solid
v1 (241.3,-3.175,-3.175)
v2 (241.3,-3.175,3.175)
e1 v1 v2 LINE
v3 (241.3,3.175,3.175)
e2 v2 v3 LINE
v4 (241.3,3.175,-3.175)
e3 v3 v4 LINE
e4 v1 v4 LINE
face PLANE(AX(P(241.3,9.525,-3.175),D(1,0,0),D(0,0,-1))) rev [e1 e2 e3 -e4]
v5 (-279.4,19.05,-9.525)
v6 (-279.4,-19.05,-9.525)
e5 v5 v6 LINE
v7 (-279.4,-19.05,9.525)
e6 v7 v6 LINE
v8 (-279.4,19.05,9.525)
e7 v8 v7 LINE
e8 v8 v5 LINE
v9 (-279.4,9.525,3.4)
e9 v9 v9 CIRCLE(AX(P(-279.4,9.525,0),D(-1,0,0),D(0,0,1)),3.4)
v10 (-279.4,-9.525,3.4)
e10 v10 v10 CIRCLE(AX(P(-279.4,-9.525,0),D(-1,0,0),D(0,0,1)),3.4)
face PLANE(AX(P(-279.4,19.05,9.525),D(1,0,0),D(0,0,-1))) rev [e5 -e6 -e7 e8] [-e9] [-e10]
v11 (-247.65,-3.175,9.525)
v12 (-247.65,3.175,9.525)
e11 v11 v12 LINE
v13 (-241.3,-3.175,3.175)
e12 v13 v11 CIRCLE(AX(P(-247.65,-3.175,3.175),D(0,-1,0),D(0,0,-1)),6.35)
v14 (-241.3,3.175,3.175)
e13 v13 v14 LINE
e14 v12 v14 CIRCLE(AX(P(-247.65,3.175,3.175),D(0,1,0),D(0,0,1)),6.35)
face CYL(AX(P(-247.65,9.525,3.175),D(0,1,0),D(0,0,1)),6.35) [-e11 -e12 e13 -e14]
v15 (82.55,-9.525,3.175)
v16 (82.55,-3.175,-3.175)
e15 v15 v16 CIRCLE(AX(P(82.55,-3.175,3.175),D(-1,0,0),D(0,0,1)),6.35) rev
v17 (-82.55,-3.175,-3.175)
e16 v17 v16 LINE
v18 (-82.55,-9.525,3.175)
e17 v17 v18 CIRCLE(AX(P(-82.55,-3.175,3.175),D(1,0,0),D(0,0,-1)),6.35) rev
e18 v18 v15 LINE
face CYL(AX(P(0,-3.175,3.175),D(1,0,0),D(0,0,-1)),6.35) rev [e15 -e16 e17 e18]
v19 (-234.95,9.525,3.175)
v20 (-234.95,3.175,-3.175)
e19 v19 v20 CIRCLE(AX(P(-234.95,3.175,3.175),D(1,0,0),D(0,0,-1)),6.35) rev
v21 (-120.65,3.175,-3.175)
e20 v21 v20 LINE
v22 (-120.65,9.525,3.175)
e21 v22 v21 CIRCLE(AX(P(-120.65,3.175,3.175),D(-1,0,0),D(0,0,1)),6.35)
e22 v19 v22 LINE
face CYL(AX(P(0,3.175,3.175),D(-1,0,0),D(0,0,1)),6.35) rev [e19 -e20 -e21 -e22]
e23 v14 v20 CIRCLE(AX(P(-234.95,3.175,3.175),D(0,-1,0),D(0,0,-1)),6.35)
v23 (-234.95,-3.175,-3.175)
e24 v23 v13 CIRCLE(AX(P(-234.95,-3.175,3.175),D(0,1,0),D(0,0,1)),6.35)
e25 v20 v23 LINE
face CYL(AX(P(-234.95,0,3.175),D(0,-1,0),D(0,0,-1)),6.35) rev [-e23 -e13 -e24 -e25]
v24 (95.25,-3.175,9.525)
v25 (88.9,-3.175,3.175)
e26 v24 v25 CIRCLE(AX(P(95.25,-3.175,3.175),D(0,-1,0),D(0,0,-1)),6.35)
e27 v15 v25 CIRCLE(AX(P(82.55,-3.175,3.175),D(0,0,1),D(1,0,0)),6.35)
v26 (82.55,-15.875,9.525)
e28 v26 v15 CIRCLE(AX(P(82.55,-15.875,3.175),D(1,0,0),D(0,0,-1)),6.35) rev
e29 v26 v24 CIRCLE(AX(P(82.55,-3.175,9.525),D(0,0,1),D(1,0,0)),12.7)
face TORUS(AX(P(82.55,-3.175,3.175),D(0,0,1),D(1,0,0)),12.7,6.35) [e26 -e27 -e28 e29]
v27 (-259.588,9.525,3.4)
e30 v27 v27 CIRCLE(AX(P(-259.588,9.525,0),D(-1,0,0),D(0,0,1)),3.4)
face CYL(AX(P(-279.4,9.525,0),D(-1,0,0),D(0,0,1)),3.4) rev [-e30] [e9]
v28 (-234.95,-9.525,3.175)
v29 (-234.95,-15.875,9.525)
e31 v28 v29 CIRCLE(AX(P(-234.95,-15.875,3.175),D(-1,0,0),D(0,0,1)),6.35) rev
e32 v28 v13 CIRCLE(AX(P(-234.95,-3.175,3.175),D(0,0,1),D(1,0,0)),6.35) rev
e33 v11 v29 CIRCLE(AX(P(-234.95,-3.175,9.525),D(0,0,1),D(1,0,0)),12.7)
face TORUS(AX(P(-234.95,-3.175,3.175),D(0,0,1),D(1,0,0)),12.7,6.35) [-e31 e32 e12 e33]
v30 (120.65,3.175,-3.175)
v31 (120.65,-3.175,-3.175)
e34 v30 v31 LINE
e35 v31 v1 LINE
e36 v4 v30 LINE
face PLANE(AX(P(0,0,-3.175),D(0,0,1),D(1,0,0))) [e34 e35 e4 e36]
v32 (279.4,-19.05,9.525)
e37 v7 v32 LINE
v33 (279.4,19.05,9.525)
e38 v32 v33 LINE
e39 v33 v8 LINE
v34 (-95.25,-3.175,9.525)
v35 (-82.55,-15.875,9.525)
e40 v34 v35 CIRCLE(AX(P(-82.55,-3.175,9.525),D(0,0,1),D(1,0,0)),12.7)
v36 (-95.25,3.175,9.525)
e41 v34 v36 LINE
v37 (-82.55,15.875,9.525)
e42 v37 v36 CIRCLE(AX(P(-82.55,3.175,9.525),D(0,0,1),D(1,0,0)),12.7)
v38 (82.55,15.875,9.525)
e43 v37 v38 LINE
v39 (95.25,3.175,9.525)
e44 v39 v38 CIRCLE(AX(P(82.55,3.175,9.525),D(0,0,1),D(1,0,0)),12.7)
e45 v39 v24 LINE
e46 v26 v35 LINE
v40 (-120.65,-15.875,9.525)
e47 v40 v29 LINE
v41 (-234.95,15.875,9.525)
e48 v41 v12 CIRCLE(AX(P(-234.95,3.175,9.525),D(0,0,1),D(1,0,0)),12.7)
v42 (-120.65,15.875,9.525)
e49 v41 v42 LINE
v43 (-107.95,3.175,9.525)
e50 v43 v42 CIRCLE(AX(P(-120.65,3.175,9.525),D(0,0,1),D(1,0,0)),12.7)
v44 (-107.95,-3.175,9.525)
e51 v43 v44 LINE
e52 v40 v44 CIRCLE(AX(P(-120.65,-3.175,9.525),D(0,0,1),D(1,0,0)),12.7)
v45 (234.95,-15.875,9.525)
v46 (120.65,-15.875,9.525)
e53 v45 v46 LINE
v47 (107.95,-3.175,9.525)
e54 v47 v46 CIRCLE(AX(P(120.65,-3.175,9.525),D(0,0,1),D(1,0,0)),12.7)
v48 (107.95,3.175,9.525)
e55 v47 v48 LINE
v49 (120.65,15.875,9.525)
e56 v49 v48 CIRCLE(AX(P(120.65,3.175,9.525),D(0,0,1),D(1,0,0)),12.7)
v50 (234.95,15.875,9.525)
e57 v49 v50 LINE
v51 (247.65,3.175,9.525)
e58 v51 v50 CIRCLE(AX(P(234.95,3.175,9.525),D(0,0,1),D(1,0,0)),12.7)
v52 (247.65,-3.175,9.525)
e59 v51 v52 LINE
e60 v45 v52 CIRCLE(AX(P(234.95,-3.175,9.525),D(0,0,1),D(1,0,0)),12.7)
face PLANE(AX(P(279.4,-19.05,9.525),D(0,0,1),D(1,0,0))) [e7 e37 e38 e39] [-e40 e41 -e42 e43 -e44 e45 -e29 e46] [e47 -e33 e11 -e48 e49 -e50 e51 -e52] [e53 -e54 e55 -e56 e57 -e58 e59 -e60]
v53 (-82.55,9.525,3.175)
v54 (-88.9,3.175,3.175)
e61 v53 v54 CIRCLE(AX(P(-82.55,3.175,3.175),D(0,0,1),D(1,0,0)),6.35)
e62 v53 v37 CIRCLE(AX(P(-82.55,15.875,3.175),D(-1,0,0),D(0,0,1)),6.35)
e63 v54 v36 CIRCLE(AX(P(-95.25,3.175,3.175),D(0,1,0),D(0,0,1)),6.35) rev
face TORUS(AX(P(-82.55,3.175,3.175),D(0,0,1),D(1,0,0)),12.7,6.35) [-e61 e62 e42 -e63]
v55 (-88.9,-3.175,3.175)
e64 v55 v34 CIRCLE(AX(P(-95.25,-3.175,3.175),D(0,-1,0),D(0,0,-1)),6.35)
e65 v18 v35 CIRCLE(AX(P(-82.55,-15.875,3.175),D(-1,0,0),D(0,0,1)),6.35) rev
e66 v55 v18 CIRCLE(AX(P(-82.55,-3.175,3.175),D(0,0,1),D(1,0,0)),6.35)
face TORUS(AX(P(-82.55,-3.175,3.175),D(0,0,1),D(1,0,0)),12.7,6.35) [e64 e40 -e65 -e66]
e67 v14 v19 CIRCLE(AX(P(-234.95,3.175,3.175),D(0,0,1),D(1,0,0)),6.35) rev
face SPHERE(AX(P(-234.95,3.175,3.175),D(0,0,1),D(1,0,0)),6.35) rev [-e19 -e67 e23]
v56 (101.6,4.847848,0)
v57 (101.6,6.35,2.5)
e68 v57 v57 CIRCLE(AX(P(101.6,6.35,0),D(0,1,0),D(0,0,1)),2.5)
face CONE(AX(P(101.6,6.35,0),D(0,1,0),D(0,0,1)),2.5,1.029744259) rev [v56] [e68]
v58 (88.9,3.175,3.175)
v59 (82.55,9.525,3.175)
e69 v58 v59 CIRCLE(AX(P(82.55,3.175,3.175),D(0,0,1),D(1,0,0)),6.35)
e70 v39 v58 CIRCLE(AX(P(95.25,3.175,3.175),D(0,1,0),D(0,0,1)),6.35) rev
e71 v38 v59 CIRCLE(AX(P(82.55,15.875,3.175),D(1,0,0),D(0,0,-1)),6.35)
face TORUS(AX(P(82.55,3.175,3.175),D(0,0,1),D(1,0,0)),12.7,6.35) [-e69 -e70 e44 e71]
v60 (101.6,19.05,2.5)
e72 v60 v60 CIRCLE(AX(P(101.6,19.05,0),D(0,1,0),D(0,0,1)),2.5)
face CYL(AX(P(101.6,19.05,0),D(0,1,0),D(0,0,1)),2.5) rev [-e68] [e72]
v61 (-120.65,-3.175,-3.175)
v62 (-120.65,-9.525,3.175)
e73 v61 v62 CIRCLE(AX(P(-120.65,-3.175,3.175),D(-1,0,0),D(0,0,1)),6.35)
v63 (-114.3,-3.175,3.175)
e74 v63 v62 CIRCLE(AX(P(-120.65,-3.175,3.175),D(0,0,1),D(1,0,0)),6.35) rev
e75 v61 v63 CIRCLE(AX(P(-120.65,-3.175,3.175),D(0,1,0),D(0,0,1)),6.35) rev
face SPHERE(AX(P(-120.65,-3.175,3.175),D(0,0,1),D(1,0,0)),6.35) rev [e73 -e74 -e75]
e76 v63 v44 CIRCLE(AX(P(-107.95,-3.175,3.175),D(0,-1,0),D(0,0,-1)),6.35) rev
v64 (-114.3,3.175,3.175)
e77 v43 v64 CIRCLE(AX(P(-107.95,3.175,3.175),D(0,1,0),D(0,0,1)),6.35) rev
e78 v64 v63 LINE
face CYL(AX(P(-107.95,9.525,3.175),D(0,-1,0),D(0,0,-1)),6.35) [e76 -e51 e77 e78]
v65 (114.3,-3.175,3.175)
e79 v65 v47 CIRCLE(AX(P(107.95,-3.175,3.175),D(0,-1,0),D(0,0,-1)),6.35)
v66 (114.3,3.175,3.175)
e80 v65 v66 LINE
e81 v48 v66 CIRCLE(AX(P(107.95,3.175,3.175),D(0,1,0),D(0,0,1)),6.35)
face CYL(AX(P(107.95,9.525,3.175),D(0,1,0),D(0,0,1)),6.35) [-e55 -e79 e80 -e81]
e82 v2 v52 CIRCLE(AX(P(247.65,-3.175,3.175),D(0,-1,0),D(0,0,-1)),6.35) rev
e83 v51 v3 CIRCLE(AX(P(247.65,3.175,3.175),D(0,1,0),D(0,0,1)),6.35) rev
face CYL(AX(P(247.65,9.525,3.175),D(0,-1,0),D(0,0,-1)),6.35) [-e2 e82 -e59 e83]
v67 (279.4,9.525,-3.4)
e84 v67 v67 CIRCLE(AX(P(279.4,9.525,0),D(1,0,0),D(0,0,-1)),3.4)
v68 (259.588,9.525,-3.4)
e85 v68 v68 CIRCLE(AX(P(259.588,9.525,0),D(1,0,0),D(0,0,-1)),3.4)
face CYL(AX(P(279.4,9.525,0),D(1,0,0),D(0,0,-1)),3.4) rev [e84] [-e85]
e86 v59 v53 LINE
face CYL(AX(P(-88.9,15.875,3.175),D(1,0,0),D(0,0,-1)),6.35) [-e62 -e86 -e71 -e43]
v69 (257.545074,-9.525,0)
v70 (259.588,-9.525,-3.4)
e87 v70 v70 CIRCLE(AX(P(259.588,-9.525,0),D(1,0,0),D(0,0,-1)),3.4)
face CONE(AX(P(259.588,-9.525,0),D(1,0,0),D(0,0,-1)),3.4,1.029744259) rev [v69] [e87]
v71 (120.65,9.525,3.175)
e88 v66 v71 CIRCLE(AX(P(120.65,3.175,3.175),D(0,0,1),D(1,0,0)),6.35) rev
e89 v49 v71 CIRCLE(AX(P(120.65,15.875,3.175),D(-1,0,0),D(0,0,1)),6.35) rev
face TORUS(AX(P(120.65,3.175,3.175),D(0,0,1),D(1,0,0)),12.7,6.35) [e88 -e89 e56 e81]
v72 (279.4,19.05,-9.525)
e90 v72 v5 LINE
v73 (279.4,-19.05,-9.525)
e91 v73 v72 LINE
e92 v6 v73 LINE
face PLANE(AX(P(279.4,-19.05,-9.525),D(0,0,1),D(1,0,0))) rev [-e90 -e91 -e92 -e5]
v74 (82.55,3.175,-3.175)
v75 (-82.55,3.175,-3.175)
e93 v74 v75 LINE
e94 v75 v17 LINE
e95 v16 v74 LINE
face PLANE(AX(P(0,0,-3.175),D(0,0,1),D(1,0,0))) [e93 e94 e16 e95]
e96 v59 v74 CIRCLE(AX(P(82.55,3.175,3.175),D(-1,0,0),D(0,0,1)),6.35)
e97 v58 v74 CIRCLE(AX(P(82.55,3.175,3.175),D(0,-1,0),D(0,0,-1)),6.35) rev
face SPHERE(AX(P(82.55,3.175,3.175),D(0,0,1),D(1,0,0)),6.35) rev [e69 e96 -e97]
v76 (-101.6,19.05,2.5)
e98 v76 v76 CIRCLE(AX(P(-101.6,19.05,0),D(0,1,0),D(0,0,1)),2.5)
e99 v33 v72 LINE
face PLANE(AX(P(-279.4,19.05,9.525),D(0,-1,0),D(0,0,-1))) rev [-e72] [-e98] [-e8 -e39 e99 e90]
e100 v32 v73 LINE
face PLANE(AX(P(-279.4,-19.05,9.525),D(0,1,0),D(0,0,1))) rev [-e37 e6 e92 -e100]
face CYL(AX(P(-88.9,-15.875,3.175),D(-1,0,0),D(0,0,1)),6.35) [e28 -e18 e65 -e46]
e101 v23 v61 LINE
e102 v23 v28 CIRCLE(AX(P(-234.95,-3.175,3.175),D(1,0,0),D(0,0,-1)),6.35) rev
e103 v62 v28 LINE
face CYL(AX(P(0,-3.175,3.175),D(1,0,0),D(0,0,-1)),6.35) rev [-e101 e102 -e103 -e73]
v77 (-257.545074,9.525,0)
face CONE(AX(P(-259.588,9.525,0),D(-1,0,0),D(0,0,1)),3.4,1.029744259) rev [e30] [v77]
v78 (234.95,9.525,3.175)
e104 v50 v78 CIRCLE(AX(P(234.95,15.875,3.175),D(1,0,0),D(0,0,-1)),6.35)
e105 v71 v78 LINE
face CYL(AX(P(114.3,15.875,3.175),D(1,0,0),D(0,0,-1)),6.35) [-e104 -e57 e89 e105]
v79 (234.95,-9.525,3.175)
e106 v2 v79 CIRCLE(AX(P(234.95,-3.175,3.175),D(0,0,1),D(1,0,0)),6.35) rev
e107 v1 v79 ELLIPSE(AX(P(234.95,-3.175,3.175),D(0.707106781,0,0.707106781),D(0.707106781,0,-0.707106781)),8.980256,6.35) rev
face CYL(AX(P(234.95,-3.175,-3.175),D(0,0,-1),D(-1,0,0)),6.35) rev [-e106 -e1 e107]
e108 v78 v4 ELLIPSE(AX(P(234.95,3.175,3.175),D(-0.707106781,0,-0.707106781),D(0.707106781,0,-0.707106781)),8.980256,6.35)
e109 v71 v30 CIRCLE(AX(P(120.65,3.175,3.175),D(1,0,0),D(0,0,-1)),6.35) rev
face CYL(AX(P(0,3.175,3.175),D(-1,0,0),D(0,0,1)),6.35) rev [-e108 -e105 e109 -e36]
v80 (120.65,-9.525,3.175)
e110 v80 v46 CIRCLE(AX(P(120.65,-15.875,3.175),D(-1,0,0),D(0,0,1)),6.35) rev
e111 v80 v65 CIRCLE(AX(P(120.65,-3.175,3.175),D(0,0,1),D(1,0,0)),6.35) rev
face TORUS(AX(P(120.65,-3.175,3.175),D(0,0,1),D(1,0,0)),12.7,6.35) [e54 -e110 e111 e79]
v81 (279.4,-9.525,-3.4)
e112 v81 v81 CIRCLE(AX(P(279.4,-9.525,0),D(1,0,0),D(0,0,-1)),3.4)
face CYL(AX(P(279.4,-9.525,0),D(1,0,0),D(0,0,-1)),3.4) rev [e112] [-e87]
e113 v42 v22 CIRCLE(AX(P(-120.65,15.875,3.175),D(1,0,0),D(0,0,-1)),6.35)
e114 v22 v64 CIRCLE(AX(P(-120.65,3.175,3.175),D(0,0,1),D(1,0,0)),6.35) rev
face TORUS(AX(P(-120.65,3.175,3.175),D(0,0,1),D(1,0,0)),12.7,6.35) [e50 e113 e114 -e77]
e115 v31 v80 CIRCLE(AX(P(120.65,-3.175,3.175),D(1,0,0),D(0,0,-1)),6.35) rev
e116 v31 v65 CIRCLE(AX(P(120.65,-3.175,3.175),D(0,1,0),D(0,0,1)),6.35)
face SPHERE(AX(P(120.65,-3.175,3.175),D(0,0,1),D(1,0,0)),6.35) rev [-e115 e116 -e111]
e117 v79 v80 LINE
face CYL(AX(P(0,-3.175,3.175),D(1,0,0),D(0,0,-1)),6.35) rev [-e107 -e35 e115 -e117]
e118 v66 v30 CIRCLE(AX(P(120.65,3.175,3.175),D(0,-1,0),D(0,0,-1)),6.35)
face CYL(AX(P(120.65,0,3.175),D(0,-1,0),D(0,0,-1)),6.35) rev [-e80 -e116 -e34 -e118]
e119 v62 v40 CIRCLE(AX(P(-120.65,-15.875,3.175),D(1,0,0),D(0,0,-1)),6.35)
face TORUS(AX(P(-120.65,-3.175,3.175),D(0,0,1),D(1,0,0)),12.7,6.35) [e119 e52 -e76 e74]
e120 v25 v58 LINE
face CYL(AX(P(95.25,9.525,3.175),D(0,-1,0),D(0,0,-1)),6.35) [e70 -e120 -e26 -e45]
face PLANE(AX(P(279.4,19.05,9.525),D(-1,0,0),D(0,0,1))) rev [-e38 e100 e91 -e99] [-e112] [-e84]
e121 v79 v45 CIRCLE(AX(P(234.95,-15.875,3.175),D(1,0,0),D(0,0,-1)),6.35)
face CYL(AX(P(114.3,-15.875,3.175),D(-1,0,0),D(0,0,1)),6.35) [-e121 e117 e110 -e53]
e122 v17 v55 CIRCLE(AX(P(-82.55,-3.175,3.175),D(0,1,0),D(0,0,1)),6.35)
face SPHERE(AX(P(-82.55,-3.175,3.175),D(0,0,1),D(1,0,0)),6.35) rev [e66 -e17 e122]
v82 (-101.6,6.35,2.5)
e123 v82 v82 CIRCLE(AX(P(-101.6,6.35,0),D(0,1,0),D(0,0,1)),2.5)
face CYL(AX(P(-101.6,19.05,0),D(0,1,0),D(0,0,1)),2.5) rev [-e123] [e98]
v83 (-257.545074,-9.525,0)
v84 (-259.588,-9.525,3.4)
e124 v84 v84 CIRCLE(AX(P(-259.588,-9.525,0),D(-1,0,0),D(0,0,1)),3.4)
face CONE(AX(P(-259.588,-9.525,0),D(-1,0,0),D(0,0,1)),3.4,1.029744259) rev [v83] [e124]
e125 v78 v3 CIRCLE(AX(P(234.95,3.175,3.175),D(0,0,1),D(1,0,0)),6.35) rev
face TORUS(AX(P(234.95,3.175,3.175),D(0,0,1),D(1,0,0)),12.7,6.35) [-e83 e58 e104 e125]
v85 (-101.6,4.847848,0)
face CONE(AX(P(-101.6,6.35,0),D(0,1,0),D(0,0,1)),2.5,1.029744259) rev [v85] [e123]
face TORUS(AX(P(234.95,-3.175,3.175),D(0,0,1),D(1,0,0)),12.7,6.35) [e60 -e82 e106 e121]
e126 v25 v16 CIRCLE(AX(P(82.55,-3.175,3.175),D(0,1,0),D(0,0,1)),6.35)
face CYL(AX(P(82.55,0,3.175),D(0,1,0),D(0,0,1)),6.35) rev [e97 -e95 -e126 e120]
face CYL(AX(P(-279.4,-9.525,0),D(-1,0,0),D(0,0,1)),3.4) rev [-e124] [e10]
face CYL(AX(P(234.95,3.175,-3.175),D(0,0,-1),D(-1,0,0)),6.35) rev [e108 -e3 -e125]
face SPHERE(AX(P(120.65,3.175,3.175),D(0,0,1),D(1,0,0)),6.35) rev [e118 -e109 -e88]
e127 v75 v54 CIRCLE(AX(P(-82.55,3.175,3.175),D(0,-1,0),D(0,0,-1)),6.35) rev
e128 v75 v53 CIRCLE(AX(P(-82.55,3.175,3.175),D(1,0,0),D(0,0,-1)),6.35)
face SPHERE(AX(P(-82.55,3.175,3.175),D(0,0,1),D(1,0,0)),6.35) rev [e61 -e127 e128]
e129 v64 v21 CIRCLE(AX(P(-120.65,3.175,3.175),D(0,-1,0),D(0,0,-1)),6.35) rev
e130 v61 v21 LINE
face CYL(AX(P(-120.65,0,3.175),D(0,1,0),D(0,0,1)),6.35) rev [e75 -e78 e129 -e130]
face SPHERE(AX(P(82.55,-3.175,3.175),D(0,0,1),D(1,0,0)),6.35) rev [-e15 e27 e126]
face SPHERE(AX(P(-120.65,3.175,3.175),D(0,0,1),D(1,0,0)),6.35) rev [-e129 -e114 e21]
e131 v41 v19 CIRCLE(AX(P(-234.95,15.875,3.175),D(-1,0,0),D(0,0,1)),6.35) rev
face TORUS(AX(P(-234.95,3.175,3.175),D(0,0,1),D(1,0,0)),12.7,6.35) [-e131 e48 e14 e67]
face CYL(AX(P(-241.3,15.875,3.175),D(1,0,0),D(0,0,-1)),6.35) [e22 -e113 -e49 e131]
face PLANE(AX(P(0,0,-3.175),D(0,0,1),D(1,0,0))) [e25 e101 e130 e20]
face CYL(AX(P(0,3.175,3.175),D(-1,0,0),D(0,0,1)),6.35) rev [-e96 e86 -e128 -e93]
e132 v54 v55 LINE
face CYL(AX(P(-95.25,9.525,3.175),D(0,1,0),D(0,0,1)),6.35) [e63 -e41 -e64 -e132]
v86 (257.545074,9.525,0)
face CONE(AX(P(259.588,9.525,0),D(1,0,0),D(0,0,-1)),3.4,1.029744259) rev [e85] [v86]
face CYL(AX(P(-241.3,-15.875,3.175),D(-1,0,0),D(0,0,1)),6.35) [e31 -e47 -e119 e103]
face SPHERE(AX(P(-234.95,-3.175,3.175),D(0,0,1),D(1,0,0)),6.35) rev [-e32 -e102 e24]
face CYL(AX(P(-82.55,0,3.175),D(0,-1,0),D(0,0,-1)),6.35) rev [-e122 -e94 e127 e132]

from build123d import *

# Parameters (mm, degrees)
SKETCH1_W                  = 558.8
SKETCH1_H                  = 38.1
EXTRUDE1_DEPTH             = 9.525
M8X1_25_TAPPED_HOLE1_D     = 6.8
M8X1_25_TAPPED_HOLE1_DEPTH = 19.812
M8X1_25_TAPPED_HOLE1_TIP   = 2.042926105
M8X1_25_TAPPED_HOLE2_D     = 6.8
M8X1_25_TAPPED_HOLE2_DEPTH = 19.812
M8X1_25_TAPPED_HOLE2_TIP   = 2.042926105
M6X1_0_TAPPED_HOLE1_D      = 5
M6X1_0_TAPPED_HOLE1_DEPTH  = 12.7
M6X1_0_TAPPED_HOLE1_TIP    = 1.502151548
SKETCH12_W                 = 177.8
SKETCH12_H                 = 19.05
SKETCH12_W_2               = 127
CUT_EXTRUDE1_DEPTH         = 12.7
FILLET1_R                  = 6.35


with BuildPart() as part:
    # Sketch1 → Extrude1 (new, symmetric)
    with BuildSketch(Plane.XY):
        Rectangle(SKETCH1_W, SKETCH1_H)
    extrude(amount=EXTRUDE1_DEPTH, both=True)

    # M8x1.25 Tapped Hole1
    with Locations(Plane.ZY.offset(279.4)):
        with Locations((0, 9.525), (0, -9.525)):
            Hole(M8X1_25_TAPPED_HOLE1_D / 2, depth=M8X1_25_TAPPED_HOLE1_DEPTH)
            with Locations((0, 0, -(M8X1_25_TAPPED_HOLE1_DEPTH + M8X1_25_TAPPED_HOLE1_TIP / 2))):  # 118° drill point
                Cone(0, M8X1_25_TAPPED_HOLE1_D / 2, M8X1_25_TAPPED_HOLE1_TIP, mode=Mode.SUBTRACT)

    # M8x1.25 Tapped Hole2
    with Locations(Plane(origin=(279.4, 0, 0), x_dir=(0, 0, -1), z_dir=(1, 0, 0))):
        with Locations((0, 9.525), (0, -9.525)):
            Hole(M8X1_25_TAPPED_HOLE2_D / 2, depth=M8X1_25_TAPPED_HOLE2_DEPTH)
            with Locations((0, 0, -(M8X1_25_TAPPED_HOLE2_DEPTH + M8X1_25_TAPPED_HOLE2_TIP / 2))):  # 118° drill point
                Cone(0, M8X1_25_TAPPED_HOLE2_D / 2, M8X1_25_TAPPED_HOLE2_TIP, mode=Mode.SUBTRACT)

    # M6x1.0 Tapped Hole1
    with Locations(Plane(origin=(0, 19.05, 0), x_dir=(1, 0, 0), z_dir=(0, 1, 0))):
        with Locations((-101.6, 0), (101.6, 0)):
            Hole(M6X1_0_TAPPED_HOLE1_D / 2, depth=M6X1_0_TAPPED_HOLE1_DEPTH)
            with Locations((0, 0, -(M6X1_0_TAPPED_HOLE1_DEPTH + M6X1_0_TAPPED_HOLE1_TIP / 2))):  # 118° drill point
                Cone(0, M6X1_0_TAPPED_HOLE1_D / 2, M6X1_0_TAPPED_HOLE1_TIP, mode=Mode.SUBTRACT)

    # Sketch12 → Cut-Extrude1 (cut)
    with BuildSketch(Plane.XY.offset(9.525)):
        Rectangle(SKETCH12_W, SKETCH12_H)
        with Locations((177.8, 0)):
            Rectangle(SKETCH12_W_2, SKETCH12_H)
        with Locations((-177.8, 0)):
            Rectangle(SKETCH12_W_2, SKETCH12_H)
    extrude(amount=-CUT_EXTRUDE1_DEPTH, mode=Mode.SUBTRACT)

    # Fillet1
    fillet1_edges = [part.edges().sort_by_distance(p)[0] for p in [
        (-114.3, 0, -3.175),
        (-114.3, 9.525, 3.175),
        (-177.8, -9.525, -3.175),
        (-114.3, -9.525, 3.175),
        (-241.3, 0, -3.175),
        (-241.3, -9.525, 3.175),
        (-177.8, 9.525, -3.175),
        (-241.3, 9.525, 3.175),
        (-114.3, 0, 9.525),
        (-177.8, 9.525, 9.525),
        (-241.3, 0, 9.525),
        (-177.8, -9.525, 9.525),
        (241.3, 9.525, 3.175),
        (177.8, -9.525, -3.175),
        (241.3, -9.525, 3.175),
        (114.3, 0, -3.175),
        (114.3, -9.525, 3.175),
        (177.8, 9.525, -3.175),
        (114.3, 9.525, 3.175),
        (241.3, 0, 9.525),
        (177.8, 9.525, 9.525),
        (114.3, 0, 9.525),
        (177.8, -9.525, 9.525),
        (88.9, 0, -3.175),
        (88.9, 9.525, 3.175),
        (0, -9.525, -3.175),
        (88.9, -9.525, 3.175),
        (-88.9, 0, -3.175),
        (-88.9, -9.525, 3.175),
        (0, 9.525, -3.175),
        (-88.9, 9.525, 3.175),
        (88.9, 0, 9.525),
        (0, 9.525, 9.525),
        (-88.9, 0, 9.525),
        (0, -9.525, 9.525),
    ]]
    fillet(fillet1_edges, radius=FILLET1_R - 0.0001)  # a hair under: the kernel refuses the full size


solid = part.part
